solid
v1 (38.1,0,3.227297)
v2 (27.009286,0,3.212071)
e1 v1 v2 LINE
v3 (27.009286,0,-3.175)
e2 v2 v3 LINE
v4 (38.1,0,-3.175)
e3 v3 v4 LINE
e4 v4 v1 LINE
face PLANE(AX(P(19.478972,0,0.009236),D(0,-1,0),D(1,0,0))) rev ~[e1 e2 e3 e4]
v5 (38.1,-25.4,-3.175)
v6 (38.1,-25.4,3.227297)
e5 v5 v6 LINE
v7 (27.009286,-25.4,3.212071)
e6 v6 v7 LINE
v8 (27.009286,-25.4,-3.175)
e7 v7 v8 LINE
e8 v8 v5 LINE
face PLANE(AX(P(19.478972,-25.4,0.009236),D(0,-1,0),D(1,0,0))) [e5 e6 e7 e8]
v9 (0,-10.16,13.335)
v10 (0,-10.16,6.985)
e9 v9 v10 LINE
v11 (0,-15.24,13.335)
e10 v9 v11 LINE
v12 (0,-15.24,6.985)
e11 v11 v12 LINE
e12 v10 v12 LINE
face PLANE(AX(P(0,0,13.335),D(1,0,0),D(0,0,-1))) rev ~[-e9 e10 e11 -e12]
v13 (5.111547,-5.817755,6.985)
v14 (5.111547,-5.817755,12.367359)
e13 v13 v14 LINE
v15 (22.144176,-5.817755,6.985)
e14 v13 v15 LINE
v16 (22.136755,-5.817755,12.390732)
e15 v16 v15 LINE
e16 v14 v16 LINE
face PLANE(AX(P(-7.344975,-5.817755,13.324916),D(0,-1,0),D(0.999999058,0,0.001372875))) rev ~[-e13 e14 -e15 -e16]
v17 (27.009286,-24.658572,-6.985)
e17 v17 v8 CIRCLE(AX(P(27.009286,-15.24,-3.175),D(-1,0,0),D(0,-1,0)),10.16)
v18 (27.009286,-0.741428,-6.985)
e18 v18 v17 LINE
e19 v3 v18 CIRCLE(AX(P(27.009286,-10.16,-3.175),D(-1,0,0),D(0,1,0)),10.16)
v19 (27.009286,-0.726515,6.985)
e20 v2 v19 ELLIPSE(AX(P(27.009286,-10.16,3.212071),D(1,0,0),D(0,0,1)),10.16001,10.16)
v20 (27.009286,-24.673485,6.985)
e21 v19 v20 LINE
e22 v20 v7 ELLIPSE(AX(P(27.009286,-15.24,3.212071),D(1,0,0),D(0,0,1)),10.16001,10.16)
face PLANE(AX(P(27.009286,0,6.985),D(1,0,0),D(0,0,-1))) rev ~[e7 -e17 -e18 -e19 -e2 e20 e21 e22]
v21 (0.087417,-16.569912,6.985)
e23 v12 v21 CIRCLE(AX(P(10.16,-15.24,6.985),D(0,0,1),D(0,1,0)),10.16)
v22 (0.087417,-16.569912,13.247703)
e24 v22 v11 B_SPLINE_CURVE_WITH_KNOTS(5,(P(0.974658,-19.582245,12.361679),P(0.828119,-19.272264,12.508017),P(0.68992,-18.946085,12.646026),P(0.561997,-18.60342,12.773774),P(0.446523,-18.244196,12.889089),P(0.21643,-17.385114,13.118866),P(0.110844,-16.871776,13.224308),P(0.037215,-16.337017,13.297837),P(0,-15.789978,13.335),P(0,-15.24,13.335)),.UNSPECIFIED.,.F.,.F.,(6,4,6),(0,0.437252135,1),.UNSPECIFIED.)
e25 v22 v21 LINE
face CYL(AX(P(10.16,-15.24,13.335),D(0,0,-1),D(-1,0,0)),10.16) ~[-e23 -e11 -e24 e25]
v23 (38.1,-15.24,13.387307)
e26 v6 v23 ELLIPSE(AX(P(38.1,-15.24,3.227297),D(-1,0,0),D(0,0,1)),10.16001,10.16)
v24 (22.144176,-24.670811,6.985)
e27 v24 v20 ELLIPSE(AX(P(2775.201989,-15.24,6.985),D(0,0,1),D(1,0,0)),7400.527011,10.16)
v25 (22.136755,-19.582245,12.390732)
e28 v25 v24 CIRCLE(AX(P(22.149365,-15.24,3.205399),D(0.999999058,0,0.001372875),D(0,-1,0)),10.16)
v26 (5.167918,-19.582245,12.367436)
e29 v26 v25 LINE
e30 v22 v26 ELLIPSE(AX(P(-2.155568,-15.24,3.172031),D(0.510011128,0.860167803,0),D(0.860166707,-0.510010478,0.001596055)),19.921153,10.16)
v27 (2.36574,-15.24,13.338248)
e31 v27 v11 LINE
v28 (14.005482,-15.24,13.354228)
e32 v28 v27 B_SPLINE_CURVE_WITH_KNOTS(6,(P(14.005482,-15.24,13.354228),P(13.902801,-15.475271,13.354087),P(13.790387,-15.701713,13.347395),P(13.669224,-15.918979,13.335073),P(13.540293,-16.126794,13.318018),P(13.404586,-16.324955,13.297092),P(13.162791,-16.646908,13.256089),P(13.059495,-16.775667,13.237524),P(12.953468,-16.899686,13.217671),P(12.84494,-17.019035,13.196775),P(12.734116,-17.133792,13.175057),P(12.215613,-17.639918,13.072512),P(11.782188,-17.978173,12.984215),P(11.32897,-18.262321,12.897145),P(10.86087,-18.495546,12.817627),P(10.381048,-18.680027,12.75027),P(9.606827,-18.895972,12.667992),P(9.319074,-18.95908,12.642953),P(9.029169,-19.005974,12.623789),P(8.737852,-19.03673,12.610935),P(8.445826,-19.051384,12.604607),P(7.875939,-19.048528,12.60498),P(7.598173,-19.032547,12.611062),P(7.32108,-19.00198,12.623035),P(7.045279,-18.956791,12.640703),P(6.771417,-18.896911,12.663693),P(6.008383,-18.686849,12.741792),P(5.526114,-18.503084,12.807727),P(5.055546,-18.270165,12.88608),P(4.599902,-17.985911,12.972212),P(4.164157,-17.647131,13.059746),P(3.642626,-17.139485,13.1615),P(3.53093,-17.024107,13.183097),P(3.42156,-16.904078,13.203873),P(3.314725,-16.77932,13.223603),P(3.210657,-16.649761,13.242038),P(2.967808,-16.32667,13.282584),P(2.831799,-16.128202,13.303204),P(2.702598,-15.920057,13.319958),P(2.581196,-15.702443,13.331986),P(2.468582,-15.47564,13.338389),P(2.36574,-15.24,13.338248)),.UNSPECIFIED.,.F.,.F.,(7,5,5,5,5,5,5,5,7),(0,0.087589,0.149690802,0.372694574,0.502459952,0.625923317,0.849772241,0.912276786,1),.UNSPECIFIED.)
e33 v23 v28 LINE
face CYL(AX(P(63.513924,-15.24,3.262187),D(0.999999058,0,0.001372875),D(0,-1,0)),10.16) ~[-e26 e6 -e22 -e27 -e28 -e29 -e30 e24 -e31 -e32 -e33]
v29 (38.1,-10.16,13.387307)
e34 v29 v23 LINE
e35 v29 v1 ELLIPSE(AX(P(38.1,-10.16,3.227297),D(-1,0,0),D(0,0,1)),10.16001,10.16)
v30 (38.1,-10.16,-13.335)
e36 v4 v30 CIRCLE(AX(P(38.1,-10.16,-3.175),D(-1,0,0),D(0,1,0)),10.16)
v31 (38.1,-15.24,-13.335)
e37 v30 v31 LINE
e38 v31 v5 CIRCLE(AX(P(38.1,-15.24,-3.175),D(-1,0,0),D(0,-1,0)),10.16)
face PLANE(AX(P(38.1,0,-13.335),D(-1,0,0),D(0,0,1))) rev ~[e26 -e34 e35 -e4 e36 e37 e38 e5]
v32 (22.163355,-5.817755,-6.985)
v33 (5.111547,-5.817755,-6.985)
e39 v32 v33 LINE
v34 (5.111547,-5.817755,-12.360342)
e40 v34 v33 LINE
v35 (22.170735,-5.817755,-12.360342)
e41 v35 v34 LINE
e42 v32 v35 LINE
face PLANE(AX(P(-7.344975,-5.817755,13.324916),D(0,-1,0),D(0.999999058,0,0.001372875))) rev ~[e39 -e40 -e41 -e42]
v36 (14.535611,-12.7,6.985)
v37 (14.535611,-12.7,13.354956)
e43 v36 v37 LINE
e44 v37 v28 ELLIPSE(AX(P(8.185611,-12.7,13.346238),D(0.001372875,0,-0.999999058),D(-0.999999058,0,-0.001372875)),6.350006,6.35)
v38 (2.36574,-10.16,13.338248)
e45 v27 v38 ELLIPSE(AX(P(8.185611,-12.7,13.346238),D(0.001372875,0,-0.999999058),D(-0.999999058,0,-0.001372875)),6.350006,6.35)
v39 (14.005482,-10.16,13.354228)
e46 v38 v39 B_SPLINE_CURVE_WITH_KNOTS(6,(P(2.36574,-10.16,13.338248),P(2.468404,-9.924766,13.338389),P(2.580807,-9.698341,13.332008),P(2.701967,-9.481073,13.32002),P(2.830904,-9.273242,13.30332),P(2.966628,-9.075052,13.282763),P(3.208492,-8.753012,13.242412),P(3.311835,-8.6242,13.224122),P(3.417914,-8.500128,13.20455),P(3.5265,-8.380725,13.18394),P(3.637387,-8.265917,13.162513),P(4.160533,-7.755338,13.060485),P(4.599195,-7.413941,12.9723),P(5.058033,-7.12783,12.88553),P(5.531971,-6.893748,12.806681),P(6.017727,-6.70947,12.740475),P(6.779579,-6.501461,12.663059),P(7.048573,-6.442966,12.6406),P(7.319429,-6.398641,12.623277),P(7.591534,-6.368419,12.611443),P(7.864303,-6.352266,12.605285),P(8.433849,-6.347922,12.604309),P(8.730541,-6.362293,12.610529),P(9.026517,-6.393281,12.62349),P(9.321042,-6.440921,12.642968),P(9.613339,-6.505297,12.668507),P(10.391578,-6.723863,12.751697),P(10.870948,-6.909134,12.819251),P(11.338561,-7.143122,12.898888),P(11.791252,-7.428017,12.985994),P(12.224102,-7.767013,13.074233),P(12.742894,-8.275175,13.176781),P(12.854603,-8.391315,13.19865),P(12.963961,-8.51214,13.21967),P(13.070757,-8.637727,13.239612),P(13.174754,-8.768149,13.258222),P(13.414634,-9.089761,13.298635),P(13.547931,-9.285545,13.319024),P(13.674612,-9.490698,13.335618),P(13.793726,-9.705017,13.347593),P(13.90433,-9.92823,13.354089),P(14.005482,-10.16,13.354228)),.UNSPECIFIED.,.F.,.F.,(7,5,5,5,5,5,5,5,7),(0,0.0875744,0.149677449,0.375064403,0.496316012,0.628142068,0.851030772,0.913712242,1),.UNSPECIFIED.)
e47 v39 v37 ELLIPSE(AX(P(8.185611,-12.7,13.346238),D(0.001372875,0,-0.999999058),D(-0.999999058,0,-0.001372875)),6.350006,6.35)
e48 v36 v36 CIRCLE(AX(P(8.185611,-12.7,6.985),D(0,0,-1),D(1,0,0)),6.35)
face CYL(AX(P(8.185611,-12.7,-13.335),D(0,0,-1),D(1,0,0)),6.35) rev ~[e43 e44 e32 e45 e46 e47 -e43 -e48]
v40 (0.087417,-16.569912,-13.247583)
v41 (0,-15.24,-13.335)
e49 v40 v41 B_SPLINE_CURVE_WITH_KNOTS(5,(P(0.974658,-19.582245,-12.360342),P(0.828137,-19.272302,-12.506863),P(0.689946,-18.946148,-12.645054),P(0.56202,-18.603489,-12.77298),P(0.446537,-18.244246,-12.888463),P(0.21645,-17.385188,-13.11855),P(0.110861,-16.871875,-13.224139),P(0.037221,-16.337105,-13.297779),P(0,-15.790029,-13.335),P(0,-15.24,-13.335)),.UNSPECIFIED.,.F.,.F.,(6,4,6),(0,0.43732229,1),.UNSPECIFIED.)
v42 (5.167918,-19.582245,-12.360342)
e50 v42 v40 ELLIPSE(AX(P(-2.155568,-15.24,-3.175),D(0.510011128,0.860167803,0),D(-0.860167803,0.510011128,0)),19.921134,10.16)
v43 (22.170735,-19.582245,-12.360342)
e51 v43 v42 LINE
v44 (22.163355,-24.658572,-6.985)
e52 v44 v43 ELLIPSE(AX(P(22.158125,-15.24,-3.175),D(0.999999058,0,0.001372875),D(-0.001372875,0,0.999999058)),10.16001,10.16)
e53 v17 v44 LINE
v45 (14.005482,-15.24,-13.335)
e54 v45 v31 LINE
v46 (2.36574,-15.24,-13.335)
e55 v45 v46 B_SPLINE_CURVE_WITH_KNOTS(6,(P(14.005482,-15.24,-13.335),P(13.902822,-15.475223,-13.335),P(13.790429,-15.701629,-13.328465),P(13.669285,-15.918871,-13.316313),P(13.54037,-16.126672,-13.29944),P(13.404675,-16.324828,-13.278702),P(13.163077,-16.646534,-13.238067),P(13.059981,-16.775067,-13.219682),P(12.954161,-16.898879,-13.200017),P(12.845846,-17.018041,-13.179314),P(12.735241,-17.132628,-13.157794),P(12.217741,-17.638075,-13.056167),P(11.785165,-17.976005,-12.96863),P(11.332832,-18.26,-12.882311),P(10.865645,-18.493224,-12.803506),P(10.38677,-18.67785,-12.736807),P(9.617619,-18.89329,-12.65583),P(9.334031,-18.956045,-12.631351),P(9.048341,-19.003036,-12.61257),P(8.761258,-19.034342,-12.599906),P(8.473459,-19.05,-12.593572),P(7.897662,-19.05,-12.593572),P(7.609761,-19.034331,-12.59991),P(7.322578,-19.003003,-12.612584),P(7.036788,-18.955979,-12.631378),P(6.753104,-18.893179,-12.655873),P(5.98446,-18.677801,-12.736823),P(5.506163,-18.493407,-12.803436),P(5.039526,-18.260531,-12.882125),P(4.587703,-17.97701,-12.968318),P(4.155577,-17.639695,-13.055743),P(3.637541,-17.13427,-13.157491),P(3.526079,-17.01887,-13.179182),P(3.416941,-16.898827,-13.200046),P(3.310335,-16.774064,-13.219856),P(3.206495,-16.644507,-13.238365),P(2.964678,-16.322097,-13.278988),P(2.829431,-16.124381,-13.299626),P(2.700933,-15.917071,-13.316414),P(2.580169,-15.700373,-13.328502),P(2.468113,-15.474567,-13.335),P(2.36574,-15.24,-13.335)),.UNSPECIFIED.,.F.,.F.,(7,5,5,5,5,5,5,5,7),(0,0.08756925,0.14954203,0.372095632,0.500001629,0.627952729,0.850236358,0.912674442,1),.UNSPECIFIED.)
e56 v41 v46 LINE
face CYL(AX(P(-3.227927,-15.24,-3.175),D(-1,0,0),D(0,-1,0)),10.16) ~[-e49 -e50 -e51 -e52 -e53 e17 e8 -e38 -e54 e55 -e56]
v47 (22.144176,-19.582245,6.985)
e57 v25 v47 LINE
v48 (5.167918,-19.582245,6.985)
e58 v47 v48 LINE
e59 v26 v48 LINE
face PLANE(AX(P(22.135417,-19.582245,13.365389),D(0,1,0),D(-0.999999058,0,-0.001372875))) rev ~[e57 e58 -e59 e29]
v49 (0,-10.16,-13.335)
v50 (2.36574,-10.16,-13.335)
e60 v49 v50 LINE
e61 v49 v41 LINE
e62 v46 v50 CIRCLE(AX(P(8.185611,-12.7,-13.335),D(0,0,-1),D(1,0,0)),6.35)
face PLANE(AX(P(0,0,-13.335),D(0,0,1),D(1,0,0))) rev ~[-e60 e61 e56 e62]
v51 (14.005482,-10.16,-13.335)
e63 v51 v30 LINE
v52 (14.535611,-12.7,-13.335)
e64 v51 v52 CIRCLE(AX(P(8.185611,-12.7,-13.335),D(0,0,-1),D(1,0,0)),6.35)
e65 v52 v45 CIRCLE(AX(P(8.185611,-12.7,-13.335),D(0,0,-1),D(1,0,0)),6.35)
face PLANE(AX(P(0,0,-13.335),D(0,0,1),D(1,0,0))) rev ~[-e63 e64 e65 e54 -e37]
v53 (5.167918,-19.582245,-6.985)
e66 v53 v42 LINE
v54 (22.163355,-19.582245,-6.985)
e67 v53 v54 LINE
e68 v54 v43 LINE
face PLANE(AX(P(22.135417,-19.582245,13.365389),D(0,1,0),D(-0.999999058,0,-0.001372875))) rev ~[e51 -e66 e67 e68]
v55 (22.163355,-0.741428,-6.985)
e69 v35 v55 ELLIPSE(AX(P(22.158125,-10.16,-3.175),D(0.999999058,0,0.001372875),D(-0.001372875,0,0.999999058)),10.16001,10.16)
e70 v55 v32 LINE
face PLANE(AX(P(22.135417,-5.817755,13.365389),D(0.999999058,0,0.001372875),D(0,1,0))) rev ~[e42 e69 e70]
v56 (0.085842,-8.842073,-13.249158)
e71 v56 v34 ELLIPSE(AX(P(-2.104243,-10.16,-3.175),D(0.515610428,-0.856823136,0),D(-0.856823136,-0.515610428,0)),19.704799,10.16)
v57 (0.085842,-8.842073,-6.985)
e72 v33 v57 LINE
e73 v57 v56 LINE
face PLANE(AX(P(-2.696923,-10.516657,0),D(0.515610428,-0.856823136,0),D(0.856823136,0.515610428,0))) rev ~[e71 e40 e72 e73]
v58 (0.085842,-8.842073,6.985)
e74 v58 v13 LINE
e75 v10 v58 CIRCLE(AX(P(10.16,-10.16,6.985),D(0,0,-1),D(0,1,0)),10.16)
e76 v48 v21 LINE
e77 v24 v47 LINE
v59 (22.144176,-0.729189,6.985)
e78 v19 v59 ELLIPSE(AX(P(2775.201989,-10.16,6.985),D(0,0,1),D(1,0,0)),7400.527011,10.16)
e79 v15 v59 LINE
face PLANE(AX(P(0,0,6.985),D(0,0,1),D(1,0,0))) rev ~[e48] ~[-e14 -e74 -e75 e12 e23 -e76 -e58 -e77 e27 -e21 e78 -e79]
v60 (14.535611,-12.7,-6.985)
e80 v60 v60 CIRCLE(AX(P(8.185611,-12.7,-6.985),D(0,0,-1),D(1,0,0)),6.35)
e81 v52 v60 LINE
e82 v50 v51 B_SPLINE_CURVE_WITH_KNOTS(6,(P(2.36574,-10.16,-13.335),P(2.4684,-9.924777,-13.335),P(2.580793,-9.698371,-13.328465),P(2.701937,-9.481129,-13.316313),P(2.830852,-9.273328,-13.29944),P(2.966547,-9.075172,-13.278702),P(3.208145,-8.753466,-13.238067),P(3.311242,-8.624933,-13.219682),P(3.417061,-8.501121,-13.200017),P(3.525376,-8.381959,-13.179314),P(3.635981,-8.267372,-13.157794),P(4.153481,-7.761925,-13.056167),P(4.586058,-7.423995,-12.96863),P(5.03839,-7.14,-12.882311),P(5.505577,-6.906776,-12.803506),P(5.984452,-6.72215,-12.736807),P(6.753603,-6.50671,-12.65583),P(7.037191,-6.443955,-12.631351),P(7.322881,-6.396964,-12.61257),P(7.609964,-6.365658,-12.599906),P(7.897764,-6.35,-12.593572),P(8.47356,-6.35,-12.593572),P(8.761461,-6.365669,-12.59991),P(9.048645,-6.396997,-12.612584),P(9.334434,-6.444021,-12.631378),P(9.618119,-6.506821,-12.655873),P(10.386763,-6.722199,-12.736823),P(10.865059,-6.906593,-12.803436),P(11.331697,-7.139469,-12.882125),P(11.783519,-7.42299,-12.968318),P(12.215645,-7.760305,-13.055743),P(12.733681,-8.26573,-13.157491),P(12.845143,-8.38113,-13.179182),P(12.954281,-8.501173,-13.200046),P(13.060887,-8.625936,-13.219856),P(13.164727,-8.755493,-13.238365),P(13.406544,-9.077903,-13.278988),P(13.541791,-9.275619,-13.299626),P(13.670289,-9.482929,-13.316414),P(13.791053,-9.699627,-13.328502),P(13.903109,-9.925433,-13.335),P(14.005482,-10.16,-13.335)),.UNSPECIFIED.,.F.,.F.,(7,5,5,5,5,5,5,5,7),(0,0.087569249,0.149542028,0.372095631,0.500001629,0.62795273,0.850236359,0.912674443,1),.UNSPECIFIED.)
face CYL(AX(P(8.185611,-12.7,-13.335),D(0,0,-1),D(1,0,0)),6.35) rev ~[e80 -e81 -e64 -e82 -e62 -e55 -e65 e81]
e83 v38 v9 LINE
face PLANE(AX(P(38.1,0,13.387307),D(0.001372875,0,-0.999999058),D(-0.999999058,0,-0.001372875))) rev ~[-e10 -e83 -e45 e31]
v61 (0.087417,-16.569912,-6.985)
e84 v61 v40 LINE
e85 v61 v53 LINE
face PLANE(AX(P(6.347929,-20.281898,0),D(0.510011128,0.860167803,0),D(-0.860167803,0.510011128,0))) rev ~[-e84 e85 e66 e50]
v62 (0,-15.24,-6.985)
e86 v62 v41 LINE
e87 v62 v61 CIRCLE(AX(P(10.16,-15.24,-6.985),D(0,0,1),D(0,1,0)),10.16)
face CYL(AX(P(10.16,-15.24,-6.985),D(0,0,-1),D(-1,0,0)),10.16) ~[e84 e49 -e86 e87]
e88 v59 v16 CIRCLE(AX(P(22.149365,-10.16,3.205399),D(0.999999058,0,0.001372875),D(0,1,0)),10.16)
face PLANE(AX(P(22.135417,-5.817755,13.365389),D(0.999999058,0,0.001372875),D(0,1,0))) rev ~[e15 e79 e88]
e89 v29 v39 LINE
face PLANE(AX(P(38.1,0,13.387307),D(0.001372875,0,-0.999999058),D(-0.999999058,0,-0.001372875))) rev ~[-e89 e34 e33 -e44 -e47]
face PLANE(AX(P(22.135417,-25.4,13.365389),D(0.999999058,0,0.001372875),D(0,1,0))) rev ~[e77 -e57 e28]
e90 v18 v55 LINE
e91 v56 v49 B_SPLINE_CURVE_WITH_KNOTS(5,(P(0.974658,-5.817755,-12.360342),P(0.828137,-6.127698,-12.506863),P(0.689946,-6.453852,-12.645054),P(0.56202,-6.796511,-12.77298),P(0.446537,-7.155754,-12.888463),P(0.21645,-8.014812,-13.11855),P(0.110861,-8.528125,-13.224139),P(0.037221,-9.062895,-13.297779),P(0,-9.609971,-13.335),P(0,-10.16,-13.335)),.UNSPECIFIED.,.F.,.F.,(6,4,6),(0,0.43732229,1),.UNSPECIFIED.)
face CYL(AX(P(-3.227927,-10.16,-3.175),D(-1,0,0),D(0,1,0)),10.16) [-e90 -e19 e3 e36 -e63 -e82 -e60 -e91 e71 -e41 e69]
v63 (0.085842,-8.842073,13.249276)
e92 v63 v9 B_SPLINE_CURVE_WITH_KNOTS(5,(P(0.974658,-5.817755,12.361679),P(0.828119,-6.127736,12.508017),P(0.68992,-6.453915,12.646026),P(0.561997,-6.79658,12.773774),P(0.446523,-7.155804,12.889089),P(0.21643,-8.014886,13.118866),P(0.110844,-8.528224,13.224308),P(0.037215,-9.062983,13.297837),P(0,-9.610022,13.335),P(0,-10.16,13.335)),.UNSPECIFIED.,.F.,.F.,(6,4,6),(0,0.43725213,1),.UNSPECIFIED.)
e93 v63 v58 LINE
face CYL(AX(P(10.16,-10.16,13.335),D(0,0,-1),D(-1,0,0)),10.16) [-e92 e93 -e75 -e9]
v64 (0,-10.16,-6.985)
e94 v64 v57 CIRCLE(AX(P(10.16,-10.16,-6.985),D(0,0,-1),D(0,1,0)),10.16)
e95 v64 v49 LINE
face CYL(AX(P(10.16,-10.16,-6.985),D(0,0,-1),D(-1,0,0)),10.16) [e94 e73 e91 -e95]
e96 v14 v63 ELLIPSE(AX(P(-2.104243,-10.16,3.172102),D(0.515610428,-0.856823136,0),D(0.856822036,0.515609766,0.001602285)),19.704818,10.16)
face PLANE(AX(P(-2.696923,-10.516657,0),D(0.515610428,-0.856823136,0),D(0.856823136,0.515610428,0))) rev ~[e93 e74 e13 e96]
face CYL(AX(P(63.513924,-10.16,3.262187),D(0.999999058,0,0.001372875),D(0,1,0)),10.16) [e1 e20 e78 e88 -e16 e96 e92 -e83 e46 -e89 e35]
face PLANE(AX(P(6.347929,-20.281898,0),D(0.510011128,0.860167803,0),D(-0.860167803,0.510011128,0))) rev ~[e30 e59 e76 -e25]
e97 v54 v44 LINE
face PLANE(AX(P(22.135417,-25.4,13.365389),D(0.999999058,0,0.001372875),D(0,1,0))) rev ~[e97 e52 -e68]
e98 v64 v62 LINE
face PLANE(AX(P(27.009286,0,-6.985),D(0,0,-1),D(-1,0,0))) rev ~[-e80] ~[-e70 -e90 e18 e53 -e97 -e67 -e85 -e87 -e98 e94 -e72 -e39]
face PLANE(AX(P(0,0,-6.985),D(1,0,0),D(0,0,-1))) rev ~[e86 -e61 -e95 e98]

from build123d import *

# Parameters (mm, degrees)
F1_DEPTH    = 25.4
F3_R        = 10.16
F2_R        = 6.35
F4_DEPTH    = 26.7233065934
F6_DEPTH    = 26.7232814104
F7_T1_DEPTH = 66.7645981405
F7_T3_DEPTH = 66.7279267596
F9_DEPTH    = 50.8


# Not quite as in the source:
# - a fillet or chamfer that OpenCascade refuses, or shapes differently, is made with other operations: its cross-section is extruded or revolved along the edge and cut away or added


with BuildPart() as f1:
    # F0 (on Front) → F1 (new body)
    with BuildSketch(Plane.XZ):
        Polygon((27.0092859864, -6.985), (19.05, -6.985), (0, -6.985), (0, -13.335), (38.1, -13.335), (38.1, 13.3873065934), (0, 13.335), (0, 6.985), (19.05, 6.985), (27.0092859864, 6.985), align=None)
    extrude(amount=F1_DEPTH)

    # F3
    f3_edges = [f1.edges().sort_by_distance(p)[0] for p in [
        (0, 0, -10.16),
        (0, 0, 10.16),
        (0, -25.4, 10.16),
        (0, -25.4, -10.16),
    ]]
    fillet(f3_edges, radius=F3_R)

    # F2 (on face) → F4 (cut, through all)
    with BuildSketch(Plane(origin=(0, 0, -13.335), x_dir=(1, 0, 0), z_dir=(0, 0, -1))):
        with Locations((8.1856111065, 12.7)):
            Circle(F2_R)
    extrude(amount=-F4_DEPTH, mode=Mode.SUBTRACT)

    # F5 (on face) → F6 (cut, through all)
    with BuildSketch(Plane(origin=(-0.0183072732, 0, 13.3349748664), x_dir=(0.9999990576, 0, 0.0013728752), z_dir=(-0.0013728752, 0, 0.9999990576))):
        with BuildLine():
            Line((20.423270762, 6.0135265812), (-7.3266747168, -5.8177547927))
            Line((-7.3266747168, -5.8177547927), (0.9929662687, -5.8177547927))
            add(Edge.make_bspline(
                [(10.1783168652, 0), (3.7432331436, 0), (0.9929662687, -5.8177547927)],
                knots=[4.7123889804, 4.7123889804, 4.7123889804, 5.8269772874, 5.8269772874, 5.8269772874], degree=2, weights=[1, 0.792172065, 0.879280631]))
            Line((10.1783168652, 0), (22.1537450551, 0))
            Line((22.1537450551, 0), (20.423270762, 6.0135265812))
        make_face()
        with BuildLine():
            add(Edge.make_bspline(
                [(10.1783168652, 0), (3.7432331436, 0), (0.9929662687, -5.8177547927)],
                knots=[4.7123889804, 4.7123889804, 4.7123889804, 5.8269772874, 5.8269772874, 5.8269772874], degree=2, weights=[1, 0.792172065, 0.879280631]))
            Line((0.9929662687, -5.8177547927), (22.1537450551, -5.8177547927))
            Line((22.1537450551, -5.8177547927), (22.1537450551, 0))
            Line((22.1537450551, 0), (10.1783168652, 0))
        make_face()
        with BuildLine():
            Line((22.1537450551, -25.4), (22.1537450551, -19.5822452073))
            Line((22.1537450551, -19.5822452073), (0.9929662687, -19.5822452073))
            add(Edge.make_bspline(
                [(0.9929662687, -19.5822452073), (3.7432331436, -25.4), (10.1783168652, -25.4)],
                knots=[0.4562080198, 0.4562080198, 0.4562080198, 1.5707963268, 1.5707963268, 1.5707963268], degree=2, weights=[0.879280631, 0.792172065, 1]))
            Line((10.1783168652, -25.4), (22.1537450551, -25.4))
        make_face()
        with BuildLine():
            Line((0.9929662687, -19.5822452073), (-6.3022147662, -19.5822452073))
            Line((-6.3022147662, -19.5822452073), (17.9763548076, -30.6573584676))
            Line((17.9763548076, -30.6573584676), (22.1537450551, -25.4))
            Line((22.1537450551, -25.4), (10.1783168652, -25.4))
            add(Edge.make_bspline(
                [(0.9929662687, -19.5822452073), (3.7432331436, -25.4), (10.1783168652, -25.4)],
                knots=[0.4562080198, 0.4562080198, 0.4562080198, 1.5707963268, 1.5707963268, 1.5707963268], degree=2, weights=[0.879280631, 0.792172065, 1]))
        make_face()
    extrude(amount=-F6_DEPTH, mode=Mode.SUBTRACT)

    # F7: fillet of radius 10.16 on 4 edges, made by hand

    # F7_s2 → F7_t1 (cut)
    with BuildSketch(Plane(origin=(63.5182833364, 0, 0.0872027564), x_dir=(0, 1, 0), z_dir=(-0.9999990576, 0, -0.0013728752))):
        with BuildLine():
            ThreePointArc((-25.4, -3.1749874332), (-22.4242048969, -10.35919233), (-15.24, -13.3349874332))
            Line((-15.24, -13.3349874332), (-25.4, -13.3349874332))
            Line((-25.4, -13.3349874332), (-25.4, -3.1749874332))
        make_face()
        with BuildLine():
            ThreePointArc((0, -3.1749874332), (-2.9757951031, -10.35919233), (-10.16, -13.3349874332))
            Line((-10.16, -13.3349874332), (0, -13.3349874332))
            Line((0, -13.3349874332), (0, -3.1749874332))
        make_face()
    extrude(amount=F7_T1_DEPTH, mode=Mode.SUBTRACT)

    # F7_s4 → F7_t3 (cut)
    with BuildSketch(Plane.YZ.offset(-3.2279267596)):
        with BuildLine():
            ThreePointArc((0, -3.175), (-2.9757951031, -10.3592048969), (-10.16, -13.335))
            Line((-10.16, -13.335), (0, -13.335))
            Line((0, -13.335), (0, -3.175))
        make_face()
        with BuildLine():
            ThreePointArc((-25.4, -3.175), (-22.4242048969, -10.3592048969), (-15.24, -13.335))
            Line((-15.24, -13.335), (-25.4, -13.335))
            Line((-25.4, -13.335), (-25.4, -3.175))
        make_face()
    extrude(amount=F7_T3_DEPTH, mode=Mode.SUBTRACT)

    # F8 (on Top) → F9 (cut, symmetric)
    with BuildSketch(Plane.XY):
        Polygon((-2.6969234459, -10.516657494), (6.3479291275, -5.0737368874), (-5.7385554537, -5.0737368874), (-5.7385554537, -20.2818978578), (6.3479291275, -20.2818978578), (-2.6969234459, -14.9190193042), align=None)
    extrude(amount=F9_DEPTH, both=True, mode=Mode.SUBTRACT)


solid = f1.part
